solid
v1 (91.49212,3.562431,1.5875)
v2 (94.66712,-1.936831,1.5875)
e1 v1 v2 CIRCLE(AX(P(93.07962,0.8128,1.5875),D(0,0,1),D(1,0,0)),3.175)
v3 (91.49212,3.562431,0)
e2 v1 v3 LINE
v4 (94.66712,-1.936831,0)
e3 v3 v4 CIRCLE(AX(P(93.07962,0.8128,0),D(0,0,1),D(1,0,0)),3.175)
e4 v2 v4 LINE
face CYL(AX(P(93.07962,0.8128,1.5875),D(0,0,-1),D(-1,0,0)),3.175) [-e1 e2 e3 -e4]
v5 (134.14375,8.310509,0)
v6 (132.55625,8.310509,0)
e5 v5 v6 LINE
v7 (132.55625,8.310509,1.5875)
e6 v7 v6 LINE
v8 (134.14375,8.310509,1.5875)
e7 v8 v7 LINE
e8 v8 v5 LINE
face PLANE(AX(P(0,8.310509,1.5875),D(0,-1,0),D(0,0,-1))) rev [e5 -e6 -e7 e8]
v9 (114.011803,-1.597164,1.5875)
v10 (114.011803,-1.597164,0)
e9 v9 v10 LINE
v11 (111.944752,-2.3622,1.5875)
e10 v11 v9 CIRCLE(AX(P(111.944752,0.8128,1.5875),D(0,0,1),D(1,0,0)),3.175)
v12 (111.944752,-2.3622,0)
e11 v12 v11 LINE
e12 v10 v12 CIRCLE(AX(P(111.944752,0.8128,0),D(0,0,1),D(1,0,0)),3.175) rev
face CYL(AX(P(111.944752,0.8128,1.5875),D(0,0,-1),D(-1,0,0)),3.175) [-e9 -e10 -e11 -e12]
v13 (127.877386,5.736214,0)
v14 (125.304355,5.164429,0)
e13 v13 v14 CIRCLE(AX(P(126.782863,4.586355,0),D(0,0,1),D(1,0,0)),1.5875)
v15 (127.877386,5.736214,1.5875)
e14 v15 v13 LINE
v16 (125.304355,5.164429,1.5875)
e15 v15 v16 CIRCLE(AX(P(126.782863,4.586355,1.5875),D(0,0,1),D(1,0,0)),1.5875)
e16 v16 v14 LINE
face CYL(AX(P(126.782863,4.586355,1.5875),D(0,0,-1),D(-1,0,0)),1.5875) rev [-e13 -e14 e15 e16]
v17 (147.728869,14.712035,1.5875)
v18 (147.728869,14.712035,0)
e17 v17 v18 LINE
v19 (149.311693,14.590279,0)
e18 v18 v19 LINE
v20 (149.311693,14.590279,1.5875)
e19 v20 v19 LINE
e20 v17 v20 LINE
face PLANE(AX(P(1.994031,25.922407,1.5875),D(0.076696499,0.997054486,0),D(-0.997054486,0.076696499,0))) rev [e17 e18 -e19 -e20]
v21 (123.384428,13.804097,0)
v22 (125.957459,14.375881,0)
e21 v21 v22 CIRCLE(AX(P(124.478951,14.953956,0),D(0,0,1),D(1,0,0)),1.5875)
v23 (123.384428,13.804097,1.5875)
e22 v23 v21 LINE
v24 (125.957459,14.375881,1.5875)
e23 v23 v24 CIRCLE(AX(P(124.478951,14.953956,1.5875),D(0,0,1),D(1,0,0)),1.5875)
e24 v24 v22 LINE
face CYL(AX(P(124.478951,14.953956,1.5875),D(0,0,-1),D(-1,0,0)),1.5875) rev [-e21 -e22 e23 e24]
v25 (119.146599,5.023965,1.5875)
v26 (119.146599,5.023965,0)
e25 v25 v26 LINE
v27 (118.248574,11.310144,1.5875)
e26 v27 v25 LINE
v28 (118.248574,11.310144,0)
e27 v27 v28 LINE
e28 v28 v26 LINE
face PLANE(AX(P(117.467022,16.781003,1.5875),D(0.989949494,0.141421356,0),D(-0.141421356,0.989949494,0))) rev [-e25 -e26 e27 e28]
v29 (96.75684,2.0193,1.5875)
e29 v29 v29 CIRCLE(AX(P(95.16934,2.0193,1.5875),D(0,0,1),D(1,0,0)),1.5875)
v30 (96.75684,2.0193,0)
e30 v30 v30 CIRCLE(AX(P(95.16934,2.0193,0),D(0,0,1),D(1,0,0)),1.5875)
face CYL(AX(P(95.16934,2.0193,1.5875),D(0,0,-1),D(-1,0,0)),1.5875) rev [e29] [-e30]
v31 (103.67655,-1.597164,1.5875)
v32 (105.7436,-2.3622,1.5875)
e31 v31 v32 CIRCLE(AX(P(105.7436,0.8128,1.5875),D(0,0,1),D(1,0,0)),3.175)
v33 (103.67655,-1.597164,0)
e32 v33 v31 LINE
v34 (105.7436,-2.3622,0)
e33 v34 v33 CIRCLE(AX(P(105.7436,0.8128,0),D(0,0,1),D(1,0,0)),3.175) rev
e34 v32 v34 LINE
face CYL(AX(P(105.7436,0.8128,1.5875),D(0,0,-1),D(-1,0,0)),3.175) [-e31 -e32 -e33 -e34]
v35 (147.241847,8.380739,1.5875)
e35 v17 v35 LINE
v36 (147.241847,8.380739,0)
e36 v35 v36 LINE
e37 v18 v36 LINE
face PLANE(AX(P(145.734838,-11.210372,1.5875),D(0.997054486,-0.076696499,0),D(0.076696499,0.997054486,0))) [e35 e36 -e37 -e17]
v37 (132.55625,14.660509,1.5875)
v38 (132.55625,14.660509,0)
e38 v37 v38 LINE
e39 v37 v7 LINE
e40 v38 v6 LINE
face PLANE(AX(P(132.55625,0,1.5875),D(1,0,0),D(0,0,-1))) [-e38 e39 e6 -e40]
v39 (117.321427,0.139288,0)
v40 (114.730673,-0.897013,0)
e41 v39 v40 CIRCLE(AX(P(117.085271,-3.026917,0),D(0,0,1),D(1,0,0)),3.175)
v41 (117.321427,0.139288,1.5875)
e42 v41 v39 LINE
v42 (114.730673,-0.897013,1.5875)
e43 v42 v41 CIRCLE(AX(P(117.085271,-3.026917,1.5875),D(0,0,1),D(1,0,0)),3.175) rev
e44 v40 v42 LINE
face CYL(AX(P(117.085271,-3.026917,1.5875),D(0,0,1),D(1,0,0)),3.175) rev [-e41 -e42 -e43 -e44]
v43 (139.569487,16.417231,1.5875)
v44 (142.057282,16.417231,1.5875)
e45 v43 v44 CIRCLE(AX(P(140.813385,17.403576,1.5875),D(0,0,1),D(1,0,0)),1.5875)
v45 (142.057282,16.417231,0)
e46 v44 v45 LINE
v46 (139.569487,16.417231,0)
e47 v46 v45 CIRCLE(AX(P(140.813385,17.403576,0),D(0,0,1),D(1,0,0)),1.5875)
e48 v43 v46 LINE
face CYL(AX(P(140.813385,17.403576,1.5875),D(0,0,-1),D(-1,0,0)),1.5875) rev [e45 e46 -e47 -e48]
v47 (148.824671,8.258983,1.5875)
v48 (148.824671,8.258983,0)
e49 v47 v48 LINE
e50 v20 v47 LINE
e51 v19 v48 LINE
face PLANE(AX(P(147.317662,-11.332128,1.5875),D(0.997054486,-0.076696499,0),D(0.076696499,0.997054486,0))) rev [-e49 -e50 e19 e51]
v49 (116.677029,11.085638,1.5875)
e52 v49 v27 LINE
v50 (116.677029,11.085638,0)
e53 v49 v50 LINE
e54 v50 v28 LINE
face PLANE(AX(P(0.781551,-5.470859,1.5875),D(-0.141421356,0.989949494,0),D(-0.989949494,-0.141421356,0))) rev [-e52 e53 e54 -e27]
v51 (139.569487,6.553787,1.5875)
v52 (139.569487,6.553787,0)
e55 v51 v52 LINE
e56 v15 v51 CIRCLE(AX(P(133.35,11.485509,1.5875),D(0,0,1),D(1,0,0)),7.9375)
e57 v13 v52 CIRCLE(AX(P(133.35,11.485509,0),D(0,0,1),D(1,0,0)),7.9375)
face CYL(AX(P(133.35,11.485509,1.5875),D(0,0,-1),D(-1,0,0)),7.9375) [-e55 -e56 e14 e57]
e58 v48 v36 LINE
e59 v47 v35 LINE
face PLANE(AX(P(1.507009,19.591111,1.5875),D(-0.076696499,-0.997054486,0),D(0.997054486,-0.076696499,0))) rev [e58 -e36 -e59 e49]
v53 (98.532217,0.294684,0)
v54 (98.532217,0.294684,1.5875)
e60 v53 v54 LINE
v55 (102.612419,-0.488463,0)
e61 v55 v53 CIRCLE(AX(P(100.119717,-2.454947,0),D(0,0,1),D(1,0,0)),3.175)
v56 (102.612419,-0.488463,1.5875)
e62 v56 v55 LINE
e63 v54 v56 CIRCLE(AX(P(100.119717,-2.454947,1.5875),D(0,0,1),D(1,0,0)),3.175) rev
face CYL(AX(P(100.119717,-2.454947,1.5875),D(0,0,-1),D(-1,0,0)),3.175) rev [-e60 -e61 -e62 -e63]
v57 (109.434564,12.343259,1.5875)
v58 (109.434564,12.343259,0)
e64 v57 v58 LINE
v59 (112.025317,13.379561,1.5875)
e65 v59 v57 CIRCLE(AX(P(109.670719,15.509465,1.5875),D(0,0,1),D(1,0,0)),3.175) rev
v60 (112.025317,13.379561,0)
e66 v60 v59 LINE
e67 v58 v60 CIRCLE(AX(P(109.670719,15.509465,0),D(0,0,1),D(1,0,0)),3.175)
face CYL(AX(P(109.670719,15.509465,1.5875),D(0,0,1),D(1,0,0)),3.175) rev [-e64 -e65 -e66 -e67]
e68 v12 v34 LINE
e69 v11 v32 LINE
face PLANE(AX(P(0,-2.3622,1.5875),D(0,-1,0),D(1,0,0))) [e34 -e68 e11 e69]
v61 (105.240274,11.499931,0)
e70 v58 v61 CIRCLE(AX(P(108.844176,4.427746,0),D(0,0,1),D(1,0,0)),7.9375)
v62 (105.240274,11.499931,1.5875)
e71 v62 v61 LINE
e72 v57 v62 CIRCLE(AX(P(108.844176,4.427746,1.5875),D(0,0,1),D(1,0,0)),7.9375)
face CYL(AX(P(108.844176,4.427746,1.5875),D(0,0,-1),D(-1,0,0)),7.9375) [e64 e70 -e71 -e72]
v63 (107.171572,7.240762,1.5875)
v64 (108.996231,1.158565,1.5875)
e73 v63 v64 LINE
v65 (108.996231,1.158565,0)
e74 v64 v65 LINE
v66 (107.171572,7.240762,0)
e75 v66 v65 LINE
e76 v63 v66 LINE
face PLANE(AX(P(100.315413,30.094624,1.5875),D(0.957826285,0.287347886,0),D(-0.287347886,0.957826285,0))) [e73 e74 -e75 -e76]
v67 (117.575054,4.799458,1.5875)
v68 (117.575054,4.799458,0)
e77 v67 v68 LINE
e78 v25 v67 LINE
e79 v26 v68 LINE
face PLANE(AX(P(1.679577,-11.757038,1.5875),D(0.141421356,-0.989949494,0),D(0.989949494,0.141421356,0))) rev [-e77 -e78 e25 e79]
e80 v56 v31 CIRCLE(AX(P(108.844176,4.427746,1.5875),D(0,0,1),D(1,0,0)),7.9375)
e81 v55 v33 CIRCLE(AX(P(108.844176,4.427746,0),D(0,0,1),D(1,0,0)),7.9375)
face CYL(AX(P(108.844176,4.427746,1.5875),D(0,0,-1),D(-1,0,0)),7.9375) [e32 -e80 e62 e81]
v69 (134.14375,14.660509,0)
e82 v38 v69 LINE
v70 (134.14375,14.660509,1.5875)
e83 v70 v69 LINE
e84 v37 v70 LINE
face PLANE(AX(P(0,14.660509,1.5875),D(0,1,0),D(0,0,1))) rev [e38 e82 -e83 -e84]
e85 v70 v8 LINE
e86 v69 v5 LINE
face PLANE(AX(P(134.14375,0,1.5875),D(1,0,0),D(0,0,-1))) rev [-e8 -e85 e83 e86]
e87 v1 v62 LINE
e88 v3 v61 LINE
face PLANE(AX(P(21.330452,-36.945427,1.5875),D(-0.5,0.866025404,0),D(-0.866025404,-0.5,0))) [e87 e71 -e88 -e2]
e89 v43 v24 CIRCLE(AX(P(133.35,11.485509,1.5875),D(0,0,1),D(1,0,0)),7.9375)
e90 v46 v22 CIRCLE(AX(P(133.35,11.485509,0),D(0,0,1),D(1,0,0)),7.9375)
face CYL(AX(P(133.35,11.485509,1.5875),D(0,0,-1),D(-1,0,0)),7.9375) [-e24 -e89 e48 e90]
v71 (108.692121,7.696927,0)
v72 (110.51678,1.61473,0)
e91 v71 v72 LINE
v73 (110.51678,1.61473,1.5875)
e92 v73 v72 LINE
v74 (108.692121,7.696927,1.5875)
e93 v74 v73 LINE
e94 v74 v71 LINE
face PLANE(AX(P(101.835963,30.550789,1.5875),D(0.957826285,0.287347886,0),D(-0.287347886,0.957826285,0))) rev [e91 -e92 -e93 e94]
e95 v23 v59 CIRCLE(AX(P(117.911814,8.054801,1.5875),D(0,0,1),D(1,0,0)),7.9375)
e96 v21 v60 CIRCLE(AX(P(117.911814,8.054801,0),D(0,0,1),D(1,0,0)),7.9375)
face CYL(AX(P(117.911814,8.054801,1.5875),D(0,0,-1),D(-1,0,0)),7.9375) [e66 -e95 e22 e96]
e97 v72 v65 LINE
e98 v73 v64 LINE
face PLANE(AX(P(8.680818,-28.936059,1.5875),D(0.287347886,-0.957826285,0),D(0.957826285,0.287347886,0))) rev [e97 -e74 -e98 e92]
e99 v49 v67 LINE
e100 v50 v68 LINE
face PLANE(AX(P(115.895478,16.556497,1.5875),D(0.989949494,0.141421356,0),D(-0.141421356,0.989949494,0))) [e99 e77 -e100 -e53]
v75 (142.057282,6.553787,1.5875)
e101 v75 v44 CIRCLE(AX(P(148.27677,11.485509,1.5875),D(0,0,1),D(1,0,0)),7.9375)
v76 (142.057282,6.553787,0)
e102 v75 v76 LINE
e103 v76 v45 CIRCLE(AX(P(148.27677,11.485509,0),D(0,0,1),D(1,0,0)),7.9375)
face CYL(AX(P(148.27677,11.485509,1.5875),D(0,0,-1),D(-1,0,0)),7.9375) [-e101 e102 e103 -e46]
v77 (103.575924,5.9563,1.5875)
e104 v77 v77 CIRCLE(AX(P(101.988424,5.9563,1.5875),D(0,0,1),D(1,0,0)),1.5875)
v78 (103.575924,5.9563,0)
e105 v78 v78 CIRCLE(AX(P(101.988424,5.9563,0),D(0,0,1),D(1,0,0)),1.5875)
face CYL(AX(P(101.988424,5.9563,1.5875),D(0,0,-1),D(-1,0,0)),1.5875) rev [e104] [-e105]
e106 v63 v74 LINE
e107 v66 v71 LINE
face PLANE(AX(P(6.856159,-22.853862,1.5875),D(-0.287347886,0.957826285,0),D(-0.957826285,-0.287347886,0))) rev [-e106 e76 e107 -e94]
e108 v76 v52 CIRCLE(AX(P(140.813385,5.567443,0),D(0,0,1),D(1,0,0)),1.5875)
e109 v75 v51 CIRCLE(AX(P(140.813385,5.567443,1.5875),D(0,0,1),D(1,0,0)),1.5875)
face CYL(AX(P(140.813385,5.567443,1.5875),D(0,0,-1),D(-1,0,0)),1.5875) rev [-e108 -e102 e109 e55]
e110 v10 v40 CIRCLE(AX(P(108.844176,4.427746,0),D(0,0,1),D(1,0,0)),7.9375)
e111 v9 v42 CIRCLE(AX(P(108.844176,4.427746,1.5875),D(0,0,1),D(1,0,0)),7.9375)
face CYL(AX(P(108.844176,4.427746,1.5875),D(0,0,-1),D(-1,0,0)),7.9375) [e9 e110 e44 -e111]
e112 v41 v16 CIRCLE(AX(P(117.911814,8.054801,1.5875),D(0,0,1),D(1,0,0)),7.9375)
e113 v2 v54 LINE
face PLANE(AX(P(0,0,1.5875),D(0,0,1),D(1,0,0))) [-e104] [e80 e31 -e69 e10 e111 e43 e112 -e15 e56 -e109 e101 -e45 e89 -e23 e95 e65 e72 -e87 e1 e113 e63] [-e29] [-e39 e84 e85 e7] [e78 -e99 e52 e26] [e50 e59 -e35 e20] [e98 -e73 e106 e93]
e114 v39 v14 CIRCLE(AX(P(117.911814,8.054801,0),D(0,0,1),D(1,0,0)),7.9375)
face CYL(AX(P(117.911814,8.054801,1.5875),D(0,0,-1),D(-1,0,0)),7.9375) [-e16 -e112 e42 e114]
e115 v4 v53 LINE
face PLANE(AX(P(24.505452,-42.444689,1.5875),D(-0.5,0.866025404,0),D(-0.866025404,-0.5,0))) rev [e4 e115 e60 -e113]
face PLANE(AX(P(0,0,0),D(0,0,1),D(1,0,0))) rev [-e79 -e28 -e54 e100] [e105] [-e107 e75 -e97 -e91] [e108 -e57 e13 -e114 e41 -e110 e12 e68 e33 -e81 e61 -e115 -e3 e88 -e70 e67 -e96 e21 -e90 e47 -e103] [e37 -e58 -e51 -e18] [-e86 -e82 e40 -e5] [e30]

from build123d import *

# Parameters (mm, degrees)
BOSS_EXTRUDE1_OUTLINE_R = 1.5875
BOSS_EXTRUDE1_OUTLINE_W = 1.5875
BOSS_EXTRUDE1_OUTLINE_H = 6.35
BOSS_EXTRUDE1_DEPTH     = 1.5875
FILLET1_R               = 3.175


# Read off the part's stored shape, not the designer's step: Boss-Extrude1
with BuildPart() as part:
    # Boss-Extrude1 outline → Boss-Extrude1 (new body)
    with BuildSketch(Plane.XY):
        with BuildLine():
            ThreePointArc((142.057282468, 6.553787305), (156.214269946, 11.485509293), (142.057282468, 16.417231281))
            ThreePointArc((142.057282468, 16.417231281), (140.813384973, 15.816075679), (139.569487477, 16.417231281))
            ThreePointArc((139.569487477, 16.417231281), (132.172803886, 19.335230024), (125.957459481, 14.375881403))
            ThreePointArc((125.957459481, 14.375881403), (124.82332848, 13.404258866), (123.384428498, 13.804096739))
            ThreePointArc((123.384428498, 13.804096739), (116.794815058, 15.913313858), (111.053922915, 12.051454261))
            ThreePointArc((111.053922915, 12.051454261), (108.094534878, 12.329767665), (105.240273774, 11.499930657))
            Line((105.240273774, 11.499930657), (91.492120489, 3.562430657))
            ThreePointArc((91.492120489, 3.562430657), (90.329989832, -0.7747), (94.667120489, -1.936830657))
            Line((94.667120489, -1.936830657), (101.318750253, 1.903489577))
            ThreePointArc((101.318750253, 1.903489577), (102.647339692, -0.532407494), (104.733149805, -2.3622))
            Line((104.733149805, -2.3622), (112.955202512, -2.3622))
            ThreePointArc((112.955202512, -2.3622), (114.503673459, -1.137682555), (115.702067342, 0.431093193))
            ThreePointArc((115.702067342, 0.431093193), (121.421294864, 0.935289323), (125.304354616, 5.164429205))
            ThreePointArc((125.304354616, 5.164429205), (126.438485618, 6.136051741), (127.8773856, 5.736213868))
            ThreePointArc((127.8773856, 5.736213868), (133.903679898, 3.567343797), (139.569487477, 6.553787305))
            ThreePointArc((139.569487477, 6.553787305), (140.813384973, 7.154942907), (142.057282468, 6.553787305))
        make_face()
        with Locations((95.169339789, 2.0193)):
            Circle(BOSS_EXTRUDE1_OUTLINE_R, mode=Mode.SUBTRACT)
        with Locations((101.988423818, 5.9563)):
            Circle(BOSS_EXTRUDE1_OUTLINE_R, mode=Mode.SUBTRACT)
        Polygon((110.516780309, 1.614730068), (108.996231081, 1.158565299), (107.171572008, 7.24076221), (108.692121236, 7.696926979), align=None, mode=Mode.SUBTRACT)
        Polygon((118.248573702, 11.310144159), (119.146599315, 5.023964874), (117.575054493, 4.799458471), (116.677028881, 11.085637756), align=None, mode=Mode.SUBTRACT)
        with Locations((133.35, 11.485509293)):
            Rectangle(BOSS_EXTRUDE1_OUTLINE_W, BOSS_EXTRUDE1_OUTLINE_H, mode=Mode.SUBTRACT)
        Polygon((149.311693327, 14.590279439), (148.82467056, 8.258983456), (147.241846564, 8.380739148), (147.728869332, 14.71203513), align=None, mode=Mode.SUBTRACT)
    extrude(amount=BOSS_EXTRUDE1_DEPTH)

    # Fillet1
    fillet1_edges = [part.edges().sort_by_distance(p)[0] for p in [
        (115.702067342, 0.431093193, 0.79375),
        (112.955202512, -2.3622, 0.79375),
        (104.733149805, -2.3622, 0.79375),
        (101.318750253, 1.903489577, 0.79375),
        (111.053922915, 12.051454261, 0.79375),
    ]]
    fillet(fillet1_edges, radius=FILLET1_R)


solid = part.part
